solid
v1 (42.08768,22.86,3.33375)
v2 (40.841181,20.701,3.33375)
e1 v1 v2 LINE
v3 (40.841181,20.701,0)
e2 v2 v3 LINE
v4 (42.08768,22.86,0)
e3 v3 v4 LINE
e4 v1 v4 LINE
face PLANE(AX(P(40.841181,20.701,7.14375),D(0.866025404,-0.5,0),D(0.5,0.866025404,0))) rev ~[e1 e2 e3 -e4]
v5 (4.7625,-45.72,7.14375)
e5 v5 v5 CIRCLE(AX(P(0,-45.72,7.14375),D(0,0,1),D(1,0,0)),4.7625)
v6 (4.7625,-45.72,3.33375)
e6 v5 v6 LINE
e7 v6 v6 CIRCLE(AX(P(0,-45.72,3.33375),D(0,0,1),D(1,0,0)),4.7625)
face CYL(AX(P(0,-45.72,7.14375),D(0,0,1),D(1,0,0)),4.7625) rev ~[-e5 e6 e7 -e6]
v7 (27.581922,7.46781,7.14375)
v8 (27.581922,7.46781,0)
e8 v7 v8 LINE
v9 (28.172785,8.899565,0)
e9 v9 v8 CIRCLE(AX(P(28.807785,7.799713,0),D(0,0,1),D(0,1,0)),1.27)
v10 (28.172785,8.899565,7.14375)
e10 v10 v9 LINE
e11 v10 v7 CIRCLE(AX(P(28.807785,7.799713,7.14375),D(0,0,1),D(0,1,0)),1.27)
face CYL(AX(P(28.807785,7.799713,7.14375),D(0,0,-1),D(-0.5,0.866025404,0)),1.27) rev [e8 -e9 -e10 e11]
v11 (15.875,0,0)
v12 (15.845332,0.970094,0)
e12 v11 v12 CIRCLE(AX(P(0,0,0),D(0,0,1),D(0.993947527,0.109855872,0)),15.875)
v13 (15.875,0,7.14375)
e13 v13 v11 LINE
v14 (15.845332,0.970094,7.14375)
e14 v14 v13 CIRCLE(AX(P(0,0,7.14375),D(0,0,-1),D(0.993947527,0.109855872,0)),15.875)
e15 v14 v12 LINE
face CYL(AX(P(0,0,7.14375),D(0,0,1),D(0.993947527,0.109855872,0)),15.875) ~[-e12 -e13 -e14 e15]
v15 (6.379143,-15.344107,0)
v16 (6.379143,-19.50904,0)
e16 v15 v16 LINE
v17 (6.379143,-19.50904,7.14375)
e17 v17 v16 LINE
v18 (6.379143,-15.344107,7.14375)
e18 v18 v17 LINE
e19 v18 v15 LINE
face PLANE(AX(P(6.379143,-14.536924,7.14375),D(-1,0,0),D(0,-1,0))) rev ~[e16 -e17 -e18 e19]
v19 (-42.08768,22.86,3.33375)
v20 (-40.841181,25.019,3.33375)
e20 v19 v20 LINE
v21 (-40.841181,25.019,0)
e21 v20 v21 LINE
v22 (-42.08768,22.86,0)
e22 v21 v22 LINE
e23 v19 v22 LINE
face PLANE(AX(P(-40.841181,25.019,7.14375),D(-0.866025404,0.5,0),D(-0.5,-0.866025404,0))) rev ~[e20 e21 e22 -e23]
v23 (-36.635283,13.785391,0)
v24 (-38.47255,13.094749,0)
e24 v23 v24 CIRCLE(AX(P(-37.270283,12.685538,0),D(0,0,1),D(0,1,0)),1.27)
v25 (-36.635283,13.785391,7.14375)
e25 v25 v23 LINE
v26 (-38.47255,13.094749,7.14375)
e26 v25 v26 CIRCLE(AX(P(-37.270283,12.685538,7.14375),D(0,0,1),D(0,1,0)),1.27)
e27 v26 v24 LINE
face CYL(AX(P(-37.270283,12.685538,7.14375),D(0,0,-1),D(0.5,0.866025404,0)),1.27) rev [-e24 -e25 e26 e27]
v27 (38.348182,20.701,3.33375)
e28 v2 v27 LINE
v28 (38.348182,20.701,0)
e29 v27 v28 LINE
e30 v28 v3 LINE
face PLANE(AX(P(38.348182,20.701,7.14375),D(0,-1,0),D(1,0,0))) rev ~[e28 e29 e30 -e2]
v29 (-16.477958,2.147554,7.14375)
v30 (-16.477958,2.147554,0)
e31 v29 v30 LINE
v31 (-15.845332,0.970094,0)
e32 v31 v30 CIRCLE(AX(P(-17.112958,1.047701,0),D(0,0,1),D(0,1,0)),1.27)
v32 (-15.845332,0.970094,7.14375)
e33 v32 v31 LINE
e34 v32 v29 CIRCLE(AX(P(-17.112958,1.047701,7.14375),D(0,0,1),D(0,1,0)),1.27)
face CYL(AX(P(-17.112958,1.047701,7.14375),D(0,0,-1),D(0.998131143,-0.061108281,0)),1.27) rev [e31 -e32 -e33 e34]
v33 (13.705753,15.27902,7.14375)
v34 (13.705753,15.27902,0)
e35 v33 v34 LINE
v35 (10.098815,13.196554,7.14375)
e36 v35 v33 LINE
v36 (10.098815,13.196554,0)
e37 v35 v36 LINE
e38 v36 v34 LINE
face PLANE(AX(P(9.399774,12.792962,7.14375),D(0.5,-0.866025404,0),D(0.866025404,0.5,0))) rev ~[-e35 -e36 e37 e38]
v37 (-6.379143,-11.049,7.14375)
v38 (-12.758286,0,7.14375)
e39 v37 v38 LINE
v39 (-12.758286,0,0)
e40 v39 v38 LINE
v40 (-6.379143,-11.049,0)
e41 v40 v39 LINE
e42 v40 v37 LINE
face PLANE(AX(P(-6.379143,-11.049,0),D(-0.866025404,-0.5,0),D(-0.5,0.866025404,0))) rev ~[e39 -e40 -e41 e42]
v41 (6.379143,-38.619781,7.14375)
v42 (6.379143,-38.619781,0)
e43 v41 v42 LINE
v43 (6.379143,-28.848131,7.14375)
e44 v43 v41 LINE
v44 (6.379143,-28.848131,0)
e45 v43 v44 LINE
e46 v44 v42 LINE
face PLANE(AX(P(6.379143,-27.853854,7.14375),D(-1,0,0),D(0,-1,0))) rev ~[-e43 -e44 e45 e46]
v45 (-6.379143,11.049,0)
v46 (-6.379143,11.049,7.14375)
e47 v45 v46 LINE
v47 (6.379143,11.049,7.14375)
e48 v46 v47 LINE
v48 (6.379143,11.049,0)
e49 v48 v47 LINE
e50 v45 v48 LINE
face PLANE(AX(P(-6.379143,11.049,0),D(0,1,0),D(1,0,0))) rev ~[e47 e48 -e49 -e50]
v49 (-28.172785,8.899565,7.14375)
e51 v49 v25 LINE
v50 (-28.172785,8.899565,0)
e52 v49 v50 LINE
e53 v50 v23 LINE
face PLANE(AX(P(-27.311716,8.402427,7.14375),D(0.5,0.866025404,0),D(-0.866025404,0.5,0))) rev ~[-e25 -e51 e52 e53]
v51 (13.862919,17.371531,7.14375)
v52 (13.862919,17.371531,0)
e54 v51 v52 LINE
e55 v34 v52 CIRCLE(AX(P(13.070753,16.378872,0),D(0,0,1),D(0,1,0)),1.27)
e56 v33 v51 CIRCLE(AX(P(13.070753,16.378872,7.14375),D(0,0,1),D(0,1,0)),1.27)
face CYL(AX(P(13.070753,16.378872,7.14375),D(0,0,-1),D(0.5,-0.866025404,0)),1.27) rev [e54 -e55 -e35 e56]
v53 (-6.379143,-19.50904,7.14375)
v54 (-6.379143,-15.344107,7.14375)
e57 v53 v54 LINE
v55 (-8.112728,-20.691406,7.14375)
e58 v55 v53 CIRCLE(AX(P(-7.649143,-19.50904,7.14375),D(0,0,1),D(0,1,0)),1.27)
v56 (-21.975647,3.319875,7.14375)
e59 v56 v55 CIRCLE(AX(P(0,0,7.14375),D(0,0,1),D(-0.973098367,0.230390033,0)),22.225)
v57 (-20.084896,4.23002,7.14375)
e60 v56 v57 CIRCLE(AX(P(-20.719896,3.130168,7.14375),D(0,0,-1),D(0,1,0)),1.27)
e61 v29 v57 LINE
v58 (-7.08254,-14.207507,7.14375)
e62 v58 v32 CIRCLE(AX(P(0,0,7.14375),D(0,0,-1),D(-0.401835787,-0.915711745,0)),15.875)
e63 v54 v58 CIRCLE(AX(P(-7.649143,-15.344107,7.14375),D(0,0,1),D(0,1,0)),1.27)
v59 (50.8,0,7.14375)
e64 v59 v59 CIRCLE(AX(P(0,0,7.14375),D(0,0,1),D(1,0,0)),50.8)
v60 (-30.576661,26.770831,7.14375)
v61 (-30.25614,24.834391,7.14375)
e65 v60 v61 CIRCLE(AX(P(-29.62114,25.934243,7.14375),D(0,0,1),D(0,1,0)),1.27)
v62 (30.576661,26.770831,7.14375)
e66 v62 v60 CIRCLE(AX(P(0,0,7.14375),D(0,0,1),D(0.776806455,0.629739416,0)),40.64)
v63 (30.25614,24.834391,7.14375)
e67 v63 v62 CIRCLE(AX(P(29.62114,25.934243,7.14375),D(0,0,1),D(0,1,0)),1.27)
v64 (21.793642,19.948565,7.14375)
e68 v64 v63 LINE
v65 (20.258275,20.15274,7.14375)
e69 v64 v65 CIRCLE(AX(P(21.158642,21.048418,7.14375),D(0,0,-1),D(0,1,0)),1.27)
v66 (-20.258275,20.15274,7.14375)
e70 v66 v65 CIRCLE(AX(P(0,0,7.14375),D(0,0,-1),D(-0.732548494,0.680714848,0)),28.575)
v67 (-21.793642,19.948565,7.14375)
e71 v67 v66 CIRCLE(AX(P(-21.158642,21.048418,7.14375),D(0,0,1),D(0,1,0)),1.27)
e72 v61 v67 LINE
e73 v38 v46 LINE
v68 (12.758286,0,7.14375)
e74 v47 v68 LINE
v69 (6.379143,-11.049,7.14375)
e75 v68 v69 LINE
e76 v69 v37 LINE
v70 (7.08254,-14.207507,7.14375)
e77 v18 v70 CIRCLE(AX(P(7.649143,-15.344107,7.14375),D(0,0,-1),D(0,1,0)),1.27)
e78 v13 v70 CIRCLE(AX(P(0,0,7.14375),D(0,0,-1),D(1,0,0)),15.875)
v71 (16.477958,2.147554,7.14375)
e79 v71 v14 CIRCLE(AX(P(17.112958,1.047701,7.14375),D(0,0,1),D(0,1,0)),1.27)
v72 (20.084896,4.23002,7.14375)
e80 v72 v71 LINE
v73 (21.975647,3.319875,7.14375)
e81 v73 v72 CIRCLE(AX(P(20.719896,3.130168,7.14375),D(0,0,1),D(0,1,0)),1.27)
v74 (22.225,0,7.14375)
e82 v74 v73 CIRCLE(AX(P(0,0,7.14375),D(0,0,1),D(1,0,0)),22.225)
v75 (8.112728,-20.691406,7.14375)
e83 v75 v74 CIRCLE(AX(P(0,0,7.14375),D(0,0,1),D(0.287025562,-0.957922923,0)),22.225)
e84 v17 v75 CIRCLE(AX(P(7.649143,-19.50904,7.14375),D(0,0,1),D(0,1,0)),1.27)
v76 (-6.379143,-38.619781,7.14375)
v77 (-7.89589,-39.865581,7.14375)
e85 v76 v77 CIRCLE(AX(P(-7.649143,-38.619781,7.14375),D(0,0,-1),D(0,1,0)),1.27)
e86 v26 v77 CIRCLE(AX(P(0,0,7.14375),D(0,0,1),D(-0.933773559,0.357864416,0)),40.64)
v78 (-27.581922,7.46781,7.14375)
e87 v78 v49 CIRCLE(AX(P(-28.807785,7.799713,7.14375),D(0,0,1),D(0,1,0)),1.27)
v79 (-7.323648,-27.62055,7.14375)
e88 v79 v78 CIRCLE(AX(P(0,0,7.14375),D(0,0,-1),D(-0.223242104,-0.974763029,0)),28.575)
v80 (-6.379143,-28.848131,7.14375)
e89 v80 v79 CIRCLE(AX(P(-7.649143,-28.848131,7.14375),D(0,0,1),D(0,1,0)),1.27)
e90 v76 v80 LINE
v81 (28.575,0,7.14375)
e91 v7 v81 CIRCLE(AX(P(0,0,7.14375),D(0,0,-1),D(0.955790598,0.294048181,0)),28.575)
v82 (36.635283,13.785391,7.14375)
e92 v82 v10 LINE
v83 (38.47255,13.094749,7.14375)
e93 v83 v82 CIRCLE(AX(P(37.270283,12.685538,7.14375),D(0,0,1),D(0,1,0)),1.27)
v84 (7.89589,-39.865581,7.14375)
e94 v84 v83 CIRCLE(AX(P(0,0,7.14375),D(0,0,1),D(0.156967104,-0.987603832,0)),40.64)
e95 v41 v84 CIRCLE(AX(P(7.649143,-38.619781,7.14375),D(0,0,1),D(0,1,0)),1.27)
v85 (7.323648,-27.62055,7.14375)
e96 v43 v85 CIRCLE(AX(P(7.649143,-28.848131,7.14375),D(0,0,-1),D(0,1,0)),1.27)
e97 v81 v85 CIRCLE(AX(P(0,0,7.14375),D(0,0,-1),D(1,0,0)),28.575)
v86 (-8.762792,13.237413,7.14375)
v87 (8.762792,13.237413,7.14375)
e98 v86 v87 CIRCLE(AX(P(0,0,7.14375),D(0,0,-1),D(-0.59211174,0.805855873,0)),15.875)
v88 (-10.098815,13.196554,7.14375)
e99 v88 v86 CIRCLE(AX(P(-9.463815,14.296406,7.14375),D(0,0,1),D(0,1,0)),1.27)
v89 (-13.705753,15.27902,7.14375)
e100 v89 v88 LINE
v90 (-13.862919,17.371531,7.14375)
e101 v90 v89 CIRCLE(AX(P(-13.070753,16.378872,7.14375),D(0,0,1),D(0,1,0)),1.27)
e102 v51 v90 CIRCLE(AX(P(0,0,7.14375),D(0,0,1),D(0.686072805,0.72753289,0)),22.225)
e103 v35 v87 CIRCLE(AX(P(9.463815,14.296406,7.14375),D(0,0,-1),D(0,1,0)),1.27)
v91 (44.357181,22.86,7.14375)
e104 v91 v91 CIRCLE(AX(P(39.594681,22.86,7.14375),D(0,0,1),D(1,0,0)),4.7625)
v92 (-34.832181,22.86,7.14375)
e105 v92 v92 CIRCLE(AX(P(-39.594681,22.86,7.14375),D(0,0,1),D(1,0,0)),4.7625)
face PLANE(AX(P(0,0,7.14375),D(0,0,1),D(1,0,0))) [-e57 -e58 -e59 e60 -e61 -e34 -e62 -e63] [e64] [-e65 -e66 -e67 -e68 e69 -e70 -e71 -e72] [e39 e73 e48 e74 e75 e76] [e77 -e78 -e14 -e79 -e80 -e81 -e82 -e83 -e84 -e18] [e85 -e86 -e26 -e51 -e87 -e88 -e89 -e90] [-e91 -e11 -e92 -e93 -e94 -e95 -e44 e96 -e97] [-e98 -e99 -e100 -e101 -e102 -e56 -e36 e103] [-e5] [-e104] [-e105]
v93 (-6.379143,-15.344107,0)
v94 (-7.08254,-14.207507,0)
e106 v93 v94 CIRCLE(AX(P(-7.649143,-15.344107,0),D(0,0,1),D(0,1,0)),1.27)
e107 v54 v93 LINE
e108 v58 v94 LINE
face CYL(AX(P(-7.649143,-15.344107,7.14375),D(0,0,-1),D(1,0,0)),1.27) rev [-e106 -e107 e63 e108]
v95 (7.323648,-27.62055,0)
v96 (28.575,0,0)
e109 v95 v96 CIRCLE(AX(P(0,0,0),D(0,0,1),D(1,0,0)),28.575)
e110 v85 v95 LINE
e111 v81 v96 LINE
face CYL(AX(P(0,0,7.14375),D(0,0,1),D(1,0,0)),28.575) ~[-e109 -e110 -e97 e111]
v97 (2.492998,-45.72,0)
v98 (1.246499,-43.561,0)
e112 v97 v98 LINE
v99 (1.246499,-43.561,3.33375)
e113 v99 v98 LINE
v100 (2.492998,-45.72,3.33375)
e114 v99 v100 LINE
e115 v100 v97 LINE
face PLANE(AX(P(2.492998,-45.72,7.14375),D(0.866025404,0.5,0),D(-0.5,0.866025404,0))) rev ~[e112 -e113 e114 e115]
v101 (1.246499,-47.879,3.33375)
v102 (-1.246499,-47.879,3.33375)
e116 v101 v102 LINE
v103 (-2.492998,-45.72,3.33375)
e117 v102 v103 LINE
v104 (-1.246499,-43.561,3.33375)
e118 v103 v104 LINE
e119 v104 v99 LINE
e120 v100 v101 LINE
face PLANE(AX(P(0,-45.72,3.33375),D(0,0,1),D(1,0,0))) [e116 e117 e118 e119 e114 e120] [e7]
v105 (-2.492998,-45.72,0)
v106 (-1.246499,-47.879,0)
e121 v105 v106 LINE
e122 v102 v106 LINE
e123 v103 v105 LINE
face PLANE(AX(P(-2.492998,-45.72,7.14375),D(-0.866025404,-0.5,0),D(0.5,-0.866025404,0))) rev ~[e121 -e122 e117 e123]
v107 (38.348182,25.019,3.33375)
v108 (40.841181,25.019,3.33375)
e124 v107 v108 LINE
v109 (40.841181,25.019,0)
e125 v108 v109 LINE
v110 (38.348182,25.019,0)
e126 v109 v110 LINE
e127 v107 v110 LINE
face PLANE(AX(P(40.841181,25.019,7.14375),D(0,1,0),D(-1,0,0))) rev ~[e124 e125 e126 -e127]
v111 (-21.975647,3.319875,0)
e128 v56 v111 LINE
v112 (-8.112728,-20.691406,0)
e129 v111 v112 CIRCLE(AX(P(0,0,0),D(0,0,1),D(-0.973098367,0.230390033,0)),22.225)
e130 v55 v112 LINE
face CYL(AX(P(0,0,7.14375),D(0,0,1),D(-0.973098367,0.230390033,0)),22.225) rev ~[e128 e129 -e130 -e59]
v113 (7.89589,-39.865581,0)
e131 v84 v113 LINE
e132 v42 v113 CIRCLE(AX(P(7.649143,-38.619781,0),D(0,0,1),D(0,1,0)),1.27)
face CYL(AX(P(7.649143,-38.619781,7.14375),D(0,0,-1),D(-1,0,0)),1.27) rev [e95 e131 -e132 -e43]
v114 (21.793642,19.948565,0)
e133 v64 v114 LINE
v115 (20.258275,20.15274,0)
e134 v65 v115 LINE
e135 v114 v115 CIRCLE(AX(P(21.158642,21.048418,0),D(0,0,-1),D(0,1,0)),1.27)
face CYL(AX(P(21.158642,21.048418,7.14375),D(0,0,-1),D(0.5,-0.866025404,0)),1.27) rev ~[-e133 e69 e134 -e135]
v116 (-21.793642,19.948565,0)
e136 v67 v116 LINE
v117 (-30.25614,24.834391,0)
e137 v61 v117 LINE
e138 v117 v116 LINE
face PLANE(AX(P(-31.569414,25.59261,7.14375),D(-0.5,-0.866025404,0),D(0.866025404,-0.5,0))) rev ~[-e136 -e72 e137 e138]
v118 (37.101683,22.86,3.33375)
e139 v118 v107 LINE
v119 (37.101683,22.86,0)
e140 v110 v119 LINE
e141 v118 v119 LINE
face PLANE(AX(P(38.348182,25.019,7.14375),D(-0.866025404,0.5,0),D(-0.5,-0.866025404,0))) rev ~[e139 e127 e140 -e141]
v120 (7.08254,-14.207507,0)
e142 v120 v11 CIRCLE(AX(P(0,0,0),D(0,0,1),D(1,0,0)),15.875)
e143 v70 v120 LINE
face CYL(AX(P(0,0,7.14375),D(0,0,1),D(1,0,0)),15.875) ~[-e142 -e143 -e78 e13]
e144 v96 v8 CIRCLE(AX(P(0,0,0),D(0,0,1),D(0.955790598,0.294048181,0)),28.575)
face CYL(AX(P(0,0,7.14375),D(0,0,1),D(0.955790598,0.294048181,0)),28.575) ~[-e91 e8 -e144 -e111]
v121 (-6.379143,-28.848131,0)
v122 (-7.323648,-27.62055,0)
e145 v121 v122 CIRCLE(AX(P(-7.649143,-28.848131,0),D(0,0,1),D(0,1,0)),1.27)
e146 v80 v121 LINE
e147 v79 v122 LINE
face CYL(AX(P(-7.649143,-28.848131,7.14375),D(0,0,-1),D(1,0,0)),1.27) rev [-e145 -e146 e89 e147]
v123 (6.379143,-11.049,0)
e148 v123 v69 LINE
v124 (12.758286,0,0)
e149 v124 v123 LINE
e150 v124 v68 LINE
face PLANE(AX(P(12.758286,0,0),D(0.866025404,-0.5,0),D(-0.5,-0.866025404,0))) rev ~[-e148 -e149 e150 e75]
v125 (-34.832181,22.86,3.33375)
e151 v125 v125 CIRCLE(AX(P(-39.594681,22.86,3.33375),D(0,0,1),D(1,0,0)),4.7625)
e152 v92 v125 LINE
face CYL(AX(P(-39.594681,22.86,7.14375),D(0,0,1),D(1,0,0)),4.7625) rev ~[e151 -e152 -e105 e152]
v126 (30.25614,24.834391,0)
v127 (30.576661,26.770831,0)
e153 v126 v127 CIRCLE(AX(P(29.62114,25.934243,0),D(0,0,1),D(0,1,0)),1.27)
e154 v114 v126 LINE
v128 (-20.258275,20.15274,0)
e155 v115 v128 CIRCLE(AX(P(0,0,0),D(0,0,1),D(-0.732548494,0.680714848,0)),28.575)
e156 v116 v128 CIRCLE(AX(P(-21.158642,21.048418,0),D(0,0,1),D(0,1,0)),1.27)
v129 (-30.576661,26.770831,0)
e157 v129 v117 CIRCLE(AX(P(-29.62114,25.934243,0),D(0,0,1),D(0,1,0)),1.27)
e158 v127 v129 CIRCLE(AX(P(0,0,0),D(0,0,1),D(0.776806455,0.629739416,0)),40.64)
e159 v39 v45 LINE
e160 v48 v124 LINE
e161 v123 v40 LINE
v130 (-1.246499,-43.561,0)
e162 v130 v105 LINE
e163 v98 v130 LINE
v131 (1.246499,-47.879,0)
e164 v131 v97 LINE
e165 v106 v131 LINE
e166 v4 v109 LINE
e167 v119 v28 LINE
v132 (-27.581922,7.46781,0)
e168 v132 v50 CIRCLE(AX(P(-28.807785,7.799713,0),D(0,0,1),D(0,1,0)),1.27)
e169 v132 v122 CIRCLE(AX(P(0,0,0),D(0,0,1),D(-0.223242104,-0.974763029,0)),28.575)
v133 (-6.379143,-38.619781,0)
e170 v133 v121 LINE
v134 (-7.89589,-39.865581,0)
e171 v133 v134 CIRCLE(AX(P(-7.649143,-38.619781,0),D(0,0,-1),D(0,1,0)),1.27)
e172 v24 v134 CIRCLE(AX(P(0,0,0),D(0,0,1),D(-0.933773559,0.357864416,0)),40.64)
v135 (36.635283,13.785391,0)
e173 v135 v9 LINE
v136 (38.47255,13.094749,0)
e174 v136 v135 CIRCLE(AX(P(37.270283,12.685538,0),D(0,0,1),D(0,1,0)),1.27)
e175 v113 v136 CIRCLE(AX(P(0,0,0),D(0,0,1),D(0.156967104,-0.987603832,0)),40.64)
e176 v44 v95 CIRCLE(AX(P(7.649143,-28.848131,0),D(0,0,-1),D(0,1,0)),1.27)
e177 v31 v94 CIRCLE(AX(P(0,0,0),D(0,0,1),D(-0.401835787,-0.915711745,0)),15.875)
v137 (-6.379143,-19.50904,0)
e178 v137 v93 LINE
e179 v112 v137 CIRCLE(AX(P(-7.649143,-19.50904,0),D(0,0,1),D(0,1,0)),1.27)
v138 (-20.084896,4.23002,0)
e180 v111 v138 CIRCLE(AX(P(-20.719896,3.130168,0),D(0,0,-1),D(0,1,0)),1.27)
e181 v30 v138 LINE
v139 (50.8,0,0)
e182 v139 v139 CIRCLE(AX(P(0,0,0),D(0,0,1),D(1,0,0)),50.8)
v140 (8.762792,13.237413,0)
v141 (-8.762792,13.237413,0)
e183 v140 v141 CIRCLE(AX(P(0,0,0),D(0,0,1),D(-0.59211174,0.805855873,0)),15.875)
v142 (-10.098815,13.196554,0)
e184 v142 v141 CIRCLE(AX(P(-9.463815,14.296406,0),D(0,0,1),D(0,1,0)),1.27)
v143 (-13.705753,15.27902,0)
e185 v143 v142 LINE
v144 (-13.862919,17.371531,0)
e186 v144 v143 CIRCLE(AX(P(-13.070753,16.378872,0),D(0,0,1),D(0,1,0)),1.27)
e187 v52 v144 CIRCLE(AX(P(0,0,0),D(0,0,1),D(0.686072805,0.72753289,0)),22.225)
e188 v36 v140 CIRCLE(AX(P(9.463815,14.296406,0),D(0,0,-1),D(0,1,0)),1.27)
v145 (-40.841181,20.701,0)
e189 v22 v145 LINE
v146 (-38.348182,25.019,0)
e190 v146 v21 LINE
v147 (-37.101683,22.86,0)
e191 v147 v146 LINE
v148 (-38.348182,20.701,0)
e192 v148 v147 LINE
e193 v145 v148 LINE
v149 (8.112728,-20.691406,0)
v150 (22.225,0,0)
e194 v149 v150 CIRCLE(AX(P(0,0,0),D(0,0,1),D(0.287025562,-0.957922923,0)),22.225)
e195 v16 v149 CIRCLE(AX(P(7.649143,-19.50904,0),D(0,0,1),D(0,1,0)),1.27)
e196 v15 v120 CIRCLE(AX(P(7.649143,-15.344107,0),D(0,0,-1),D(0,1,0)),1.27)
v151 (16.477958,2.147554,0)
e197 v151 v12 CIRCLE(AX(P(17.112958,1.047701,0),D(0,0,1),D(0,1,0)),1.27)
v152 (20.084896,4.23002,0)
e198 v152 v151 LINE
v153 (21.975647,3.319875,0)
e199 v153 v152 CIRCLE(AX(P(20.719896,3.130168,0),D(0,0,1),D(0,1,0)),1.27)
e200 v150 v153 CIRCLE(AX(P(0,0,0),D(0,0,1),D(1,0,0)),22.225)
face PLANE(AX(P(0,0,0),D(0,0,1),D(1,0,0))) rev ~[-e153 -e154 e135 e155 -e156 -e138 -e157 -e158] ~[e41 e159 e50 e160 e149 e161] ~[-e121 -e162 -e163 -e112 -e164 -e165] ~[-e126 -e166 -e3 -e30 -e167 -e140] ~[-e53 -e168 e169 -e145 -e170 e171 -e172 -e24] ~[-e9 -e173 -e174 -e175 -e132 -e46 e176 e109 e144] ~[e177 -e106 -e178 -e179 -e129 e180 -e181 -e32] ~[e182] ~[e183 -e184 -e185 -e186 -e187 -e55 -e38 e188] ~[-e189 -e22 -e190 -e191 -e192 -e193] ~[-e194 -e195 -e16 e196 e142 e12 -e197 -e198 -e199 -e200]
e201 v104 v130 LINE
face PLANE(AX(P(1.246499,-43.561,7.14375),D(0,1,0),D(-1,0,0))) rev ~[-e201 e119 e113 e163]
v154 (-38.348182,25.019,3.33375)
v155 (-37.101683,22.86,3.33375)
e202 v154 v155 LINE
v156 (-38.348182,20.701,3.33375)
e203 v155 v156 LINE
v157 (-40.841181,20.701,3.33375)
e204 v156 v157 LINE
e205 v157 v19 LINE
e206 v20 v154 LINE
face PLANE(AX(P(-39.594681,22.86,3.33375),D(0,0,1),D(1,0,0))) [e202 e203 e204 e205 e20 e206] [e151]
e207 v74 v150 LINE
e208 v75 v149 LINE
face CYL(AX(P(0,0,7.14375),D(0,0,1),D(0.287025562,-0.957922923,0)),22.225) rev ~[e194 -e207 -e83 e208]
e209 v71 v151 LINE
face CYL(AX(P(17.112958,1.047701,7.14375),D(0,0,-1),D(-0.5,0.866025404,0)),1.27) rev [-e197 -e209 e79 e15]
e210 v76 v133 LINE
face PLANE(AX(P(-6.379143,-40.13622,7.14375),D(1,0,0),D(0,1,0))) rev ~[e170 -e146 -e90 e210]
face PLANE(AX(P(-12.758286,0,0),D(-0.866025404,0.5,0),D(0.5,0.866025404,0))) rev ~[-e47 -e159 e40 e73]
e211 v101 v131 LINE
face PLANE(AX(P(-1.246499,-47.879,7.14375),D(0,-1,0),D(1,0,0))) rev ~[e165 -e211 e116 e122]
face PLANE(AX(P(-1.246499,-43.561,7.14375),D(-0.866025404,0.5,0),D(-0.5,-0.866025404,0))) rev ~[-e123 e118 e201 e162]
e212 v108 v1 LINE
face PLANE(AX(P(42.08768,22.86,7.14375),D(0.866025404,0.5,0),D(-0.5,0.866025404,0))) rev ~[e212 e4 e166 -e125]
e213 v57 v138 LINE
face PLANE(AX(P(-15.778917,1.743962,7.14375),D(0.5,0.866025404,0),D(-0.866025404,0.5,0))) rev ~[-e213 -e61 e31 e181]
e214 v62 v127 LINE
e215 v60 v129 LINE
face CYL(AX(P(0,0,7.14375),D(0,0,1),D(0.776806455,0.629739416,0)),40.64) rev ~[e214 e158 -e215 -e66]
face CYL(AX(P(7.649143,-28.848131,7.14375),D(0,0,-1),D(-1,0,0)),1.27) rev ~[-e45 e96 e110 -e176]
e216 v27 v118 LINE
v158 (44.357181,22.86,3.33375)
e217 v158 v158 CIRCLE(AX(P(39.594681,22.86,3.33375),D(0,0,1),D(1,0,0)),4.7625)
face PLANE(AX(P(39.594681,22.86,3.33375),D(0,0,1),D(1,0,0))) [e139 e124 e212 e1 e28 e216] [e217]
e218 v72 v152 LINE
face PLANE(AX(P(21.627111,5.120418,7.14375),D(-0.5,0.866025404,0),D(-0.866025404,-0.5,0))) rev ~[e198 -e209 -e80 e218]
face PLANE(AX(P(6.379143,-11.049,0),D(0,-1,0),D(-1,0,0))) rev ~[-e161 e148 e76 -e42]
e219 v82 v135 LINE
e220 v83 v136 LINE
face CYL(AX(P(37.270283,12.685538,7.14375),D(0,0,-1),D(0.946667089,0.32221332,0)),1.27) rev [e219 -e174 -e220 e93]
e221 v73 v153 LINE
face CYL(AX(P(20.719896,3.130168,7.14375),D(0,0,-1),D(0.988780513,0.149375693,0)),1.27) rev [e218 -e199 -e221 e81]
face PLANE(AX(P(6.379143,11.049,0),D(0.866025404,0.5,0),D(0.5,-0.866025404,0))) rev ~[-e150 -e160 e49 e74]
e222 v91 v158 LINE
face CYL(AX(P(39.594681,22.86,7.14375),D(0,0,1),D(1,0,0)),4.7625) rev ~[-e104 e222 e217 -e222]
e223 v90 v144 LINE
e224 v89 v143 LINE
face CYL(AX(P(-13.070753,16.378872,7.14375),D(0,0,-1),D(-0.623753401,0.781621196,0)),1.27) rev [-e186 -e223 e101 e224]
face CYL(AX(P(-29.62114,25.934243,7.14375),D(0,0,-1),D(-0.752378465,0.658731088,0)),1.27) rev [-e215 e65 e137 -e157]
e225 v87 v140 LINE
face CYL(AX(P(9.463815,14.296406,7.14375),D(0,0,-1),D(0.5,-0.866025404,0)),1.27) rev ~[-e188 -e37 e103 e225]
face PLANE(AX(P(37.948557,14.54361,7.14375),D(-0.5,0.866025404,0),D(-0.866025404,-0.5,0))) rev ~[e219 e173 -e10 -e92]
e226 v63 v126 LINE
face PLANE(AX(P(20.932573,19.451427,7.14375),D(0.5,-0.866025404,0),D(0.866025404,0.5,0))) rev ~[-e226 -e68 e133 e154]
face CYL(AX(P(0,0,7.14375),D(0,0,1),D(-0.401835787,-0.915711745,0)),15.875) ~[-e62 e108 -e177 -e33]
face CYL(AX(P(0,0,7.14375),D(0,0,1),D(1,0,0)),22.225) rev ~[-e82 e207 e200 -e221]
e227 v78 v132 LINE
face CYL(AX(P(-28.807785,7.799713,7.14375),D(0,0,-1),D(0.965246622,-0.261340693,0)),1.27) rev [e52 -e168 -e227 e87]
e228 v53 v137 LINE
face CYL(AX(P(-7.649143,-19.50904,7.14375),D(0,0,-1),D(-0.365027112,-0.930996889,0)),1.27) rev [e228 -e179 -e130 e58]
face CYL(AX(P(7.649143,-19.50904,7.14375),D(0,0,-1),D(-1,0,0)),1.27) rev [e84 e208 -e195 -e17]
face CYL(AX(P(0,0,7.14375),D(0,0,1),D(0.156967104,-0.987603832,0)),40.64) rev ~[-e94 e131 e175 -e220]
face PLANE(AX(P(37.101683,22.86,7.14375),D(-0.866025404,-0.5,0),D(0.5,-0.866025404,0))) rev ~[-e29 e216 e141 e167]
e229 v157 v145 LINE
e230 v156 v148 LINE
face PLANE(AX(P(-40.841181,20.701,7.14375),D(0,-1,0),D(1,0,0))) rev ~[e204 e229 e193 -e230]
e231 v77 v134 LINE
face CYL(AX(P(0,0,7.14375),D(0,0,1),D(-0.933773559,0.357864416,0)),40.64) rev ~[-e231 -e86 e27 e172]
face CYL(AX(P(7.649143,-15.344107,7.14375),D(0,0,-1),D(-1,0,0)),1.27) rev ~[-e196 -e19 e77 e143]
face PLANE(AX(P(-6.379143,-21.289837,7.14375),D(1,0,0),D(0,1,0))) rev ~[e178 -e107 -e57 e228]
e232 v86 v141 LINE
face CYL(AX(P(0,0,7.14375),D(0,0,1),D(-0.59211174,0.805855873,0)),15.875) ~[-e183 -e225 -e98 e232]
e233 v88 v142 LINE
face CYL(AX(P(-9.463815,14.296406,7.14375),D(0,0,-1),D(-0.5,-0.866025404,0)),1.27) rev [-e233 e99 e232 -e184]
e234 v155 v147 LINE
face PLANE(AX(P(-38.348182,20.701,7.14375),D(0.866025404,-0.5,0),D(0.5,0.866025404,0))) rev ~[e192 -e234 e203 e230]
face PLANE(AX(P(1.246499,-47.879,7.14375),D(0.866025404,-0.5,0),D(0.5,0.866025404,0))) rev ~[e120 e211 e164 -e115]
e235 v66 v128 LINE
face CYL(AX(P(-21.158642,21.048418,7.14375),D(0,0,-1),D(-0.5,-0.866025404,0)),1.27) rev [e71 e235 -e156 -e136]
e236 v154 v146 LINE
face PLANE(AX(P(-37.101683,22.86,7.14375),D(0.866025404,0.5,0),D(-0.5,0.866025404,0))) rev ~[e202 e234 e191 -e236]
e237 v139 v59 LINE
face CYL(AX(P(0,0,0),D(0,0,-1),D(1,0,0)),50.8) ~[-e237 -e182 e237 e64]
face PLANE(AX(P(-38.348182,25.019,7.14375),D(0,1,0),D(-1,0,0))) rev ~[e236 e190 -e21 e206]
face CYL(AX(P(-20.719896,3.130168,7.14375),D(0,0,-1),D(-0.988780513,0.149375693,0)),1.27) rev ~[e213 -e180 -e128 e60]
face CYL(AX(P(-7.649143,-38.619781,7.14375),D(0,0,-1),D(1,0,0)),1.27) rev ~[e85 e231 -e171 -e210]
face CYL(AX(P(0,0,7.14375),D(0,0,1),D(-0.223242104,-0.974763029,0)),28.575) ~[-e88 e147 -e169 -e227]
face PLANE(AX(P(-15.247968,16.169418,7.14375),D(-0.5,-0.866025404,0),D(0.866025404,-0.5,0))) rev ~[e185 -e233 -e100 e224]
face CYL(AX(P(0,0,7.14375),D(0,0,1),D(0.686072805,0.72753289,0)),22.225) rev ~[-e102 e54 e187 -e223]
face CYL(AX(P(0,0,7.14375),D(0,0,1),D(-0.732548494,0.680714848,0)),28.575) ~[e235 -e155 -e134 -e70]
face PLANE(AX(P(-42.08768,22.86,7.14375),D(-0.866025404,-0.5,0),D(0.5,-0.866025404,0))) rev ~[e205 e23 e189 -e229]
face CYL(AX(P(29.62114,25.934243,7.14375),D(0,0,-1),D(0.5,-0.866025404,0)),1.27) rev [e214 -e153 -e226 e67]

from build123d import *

# Parameters (mm, degrees)
F0_R     = 50.8
F1_DEPTH = 7.14375
F3_DEPTH = 7.14475
F4_R     = 1.27
F5_R     = 4.7625
F6_DEPTH = 3.81


with BuildPart() as f1:
    # F0 (on Top) → F1 (new body)
    with BuildSketch(Plane.XY):
        Circle(F0_R)
        Polygon((-12.7582862486, 0), (-6.3791431243, 11.049), (6.3791431243, 11.049), (12.7582862486, 0), (6.3791431243, -11.049), (-6.3791431243, -11.049), align=None, mode=Mode.SUBTRACT)
    extrude(amount=F1_DEPTH)

    # F2 (on face) → F3 (cut, through all)
    with BuildSketch(Plane.XY.offset(7.14375)):
        with BuildLine():
            Line((-6.3791431243, -40.1362197149), (-6.3791431243, -27.8538535575))
            ThreePointArc((-6.3791431243, -27.8538535575), (-24.7466759131, -14.2875), (-27.3117163362, 8.4024267787))
            Line((-27.3117163362, 8.4024267787), (-37.9485574471, 14.5436098574))
            ThreePointArc((-37.9485574471, 14.5436098574), (-35.1952724098, -20.32), (-6.3791431243, -40.1362197149))
        make_face()
        Polygon((-38.3481822298, 25.019), (-40.8411806922, 25.019), (-42.0876799234, 22.86), (-40.8411806922, 20.701), (-38.3481822298, 20.701), (-37.1016829987, 22.86), align=None)
        Polygon((1.2464992312, -43.561), (-1.2464992312, -43.561), (-2.4929984624, -45.72), (-1.2464992312, -47.879), (1.2464992312, -47.879), (2.4929984624, -45.72), align=None)
        Polygon((40.8411806922, 25.019), (38.3481822298, 25.019), (37.1016829987, 22.86), (38.3481822298, 20.701), (40.8411806922, 20.701), (42.0876799234, 22.86), align=None)
        with BuildLine():
            ThreePointArc((-20.9325732119, 19.4514267787), (0, 28.575), (20.9325732119, 19.4514267787))
            Line((20.9325732119, 19.4514267787), (31.5694143228, 25.5926098574))
            ThreePointArc((31.5694143228, 25.5926098574), (0, 40.64), (-31.5694143228, 25.5926098574))
            Line((-31.5694143228, 25.5926098574), (-20.9325732119, 19.4514267787))
        make_face()
        with BuildLine():
            Line((6.3791431243, -27.8538535575), (6.3791431243, -40.1362197149))
            ThreePointArc((6.3791431243, -40.1362197149), (35.1952724098, -20.32), (37.9485574471, 14.5436098574))
            Line((37.9485574471, 14.5436098574), (27.3117163362, 8.4024267787))
            ThreePointArc((27.3117163362, 8.4024267787), (28.2574142422, 4.2484309276), (28.575, 0))
            ThreePointArc((28.575, 0), (22.3474231152, -17.8079562306), (6.3791431243, -27.8538535575))
        make_face()
        with BuildLine():
            Line((6.3791431243, -14.5369239525), (6.3791431243, -21.2898369651))
            ThreePointArc((6.3791431243, -21.2898369651), (17.8287279543, -13.2697808773), (22.225, 0))
            ThreePointArc((22.225, 0), (22.0750217642, 2.5776033652), (21.6271112163, 5.1204184825))
            Line((21.6271112163, 5.1204184825), (15.7789169979, 1.7439619762))
            ThreePointArc((15.7789169979, 1.7439619762), (15.8509610488, 0.8733034006), (15.875, 0))
            ThreePointArc((15.875, 0), (13.2906832424, -8.6817834545), (6.3791431243, -14.5369239525))
        make_face()
        with BuildLine():
            Line((9.3997738736, 12.7929619762), (15.2479680921, 16.1694184825))
            ThreePointArc((15.2479680921, 16.1694184825), (0, 22.225), (-15.2479680921, 16.1694184825))
            Line((-15.2479680921, 16.1694184825), (-9.3997738736, 12.7929619762))
            ThreePointArc((-9.3997738736, 12.7929619762), (0, 15.875), (9.3997738736, 12.7929619762))
        make_face()
        with BuildLine():
            ThreePointArc((-21.6271112163, 5.1204184825), (-19.2474145991, -11.1125), (-6.3791431243, -21.2898369651))
            Line((-6.3791431243, -21.2898369651), (-6.3791431243, -14.5369239525))
            ThreePointArc((-6.3791431243, -14.5369239525), (-13.7481532851, -7.9375), (-15.7789169979, 1.7439619762))
            Line((-15.7789169979, 1.7439619762), (-21.6271112163, 5.1204184825))
        make_face()
    extrude(amount=-F3_DEPTH, mode=Mode.SUBTRACT)

    # F4
    f4_edges = [f1.edges().sort_by_distance(p)[0] for p in [
        (-37.948557, 14.54361, 3.571875),
        (-27.311716, 8.402427, 3.571875),
        (-6.379143, -40.13622, 3.571875),
        (-6.379143, -27.853854, 3.571875),
        (-21.627111, 5.120418, 3.571875),
        (-15.778917, 1.743962, 3.571875),
        (-6.379143, -21.289837, 3.571875),
        (-6.379143, -14.536924, 3.571875),
        (6.379143, -21.289837, 3.571875),
        (6.379143, -14.536924, 3.571875),
        (21.627111, 5.120418, 3.571875),
        (15.778917, 1.743962, 3.571875),
        (6.379143, -40.13622, 3.571875),
        (6.379143, -27.853854, 3.571875),
        (37.948557, 14.54361, 3.571875),
        (27.311716, 8.402427, 3.571875),
        (31.569414, 25.59261, 3.571875),
        (20.932573, 19.451427, 3.571875),
        (-31.569414, 25.59261, 3.571875),
        (-20.932573, 19.451427, 3.571875),
        (15.247968, 16.169418, 3.571875),
        (9.399774, 12.792962, 3.571875),
        (-15.247968, 16.169418, 3.571875),
        (-9.399774, 12.792962, 3.571875),
    ]]
    fillet(f4_edges, radius=F4_R)

    # F5 (on face) → F6 (cut)
    with BuildSketch(Plane.XY.offset(7.14375)):
        with Locations((-39.594681461, 22.86)):
            Circle(F5_R)
        Polygon((-42.0876799234, 22.86), (-40.8411806922, 25.019), (-38.3481822298, 25.019), (-37.1016829987, 22.86), (-38.3481822298, 20.701), (-40.8411806922, 20.701), align=None, mode=Mode.SUBTRACT)
        with Locations((39.594681461, 22.86)):
            Circle(F5_R)
        Polygon((38.3481822298, 25.019), (40.8411806922, 25.019), (42.0876799234, 22.86), (40.8411806922, 20.701), (38.3481822298, 20.701), (37.1016829987, 22.86), align=None, mode=Mode.SUBTRACT)
        with Locations((0, -45.72)):
            Circle(F5_R)
        Polygon((-2.4929984624, -45.72), (-1.2464992312, -43.561), (1.2464992312, -43.561), (2.4929984624, -45.72), (1.2464992312, -47.879), (-1.2464992312, -47.879), align=None, mode=Mode.SUBTRACT)
    extrude(amount=-F6_DEPTH, mode=Mode.SUBTRACT)


solid = f1.part
